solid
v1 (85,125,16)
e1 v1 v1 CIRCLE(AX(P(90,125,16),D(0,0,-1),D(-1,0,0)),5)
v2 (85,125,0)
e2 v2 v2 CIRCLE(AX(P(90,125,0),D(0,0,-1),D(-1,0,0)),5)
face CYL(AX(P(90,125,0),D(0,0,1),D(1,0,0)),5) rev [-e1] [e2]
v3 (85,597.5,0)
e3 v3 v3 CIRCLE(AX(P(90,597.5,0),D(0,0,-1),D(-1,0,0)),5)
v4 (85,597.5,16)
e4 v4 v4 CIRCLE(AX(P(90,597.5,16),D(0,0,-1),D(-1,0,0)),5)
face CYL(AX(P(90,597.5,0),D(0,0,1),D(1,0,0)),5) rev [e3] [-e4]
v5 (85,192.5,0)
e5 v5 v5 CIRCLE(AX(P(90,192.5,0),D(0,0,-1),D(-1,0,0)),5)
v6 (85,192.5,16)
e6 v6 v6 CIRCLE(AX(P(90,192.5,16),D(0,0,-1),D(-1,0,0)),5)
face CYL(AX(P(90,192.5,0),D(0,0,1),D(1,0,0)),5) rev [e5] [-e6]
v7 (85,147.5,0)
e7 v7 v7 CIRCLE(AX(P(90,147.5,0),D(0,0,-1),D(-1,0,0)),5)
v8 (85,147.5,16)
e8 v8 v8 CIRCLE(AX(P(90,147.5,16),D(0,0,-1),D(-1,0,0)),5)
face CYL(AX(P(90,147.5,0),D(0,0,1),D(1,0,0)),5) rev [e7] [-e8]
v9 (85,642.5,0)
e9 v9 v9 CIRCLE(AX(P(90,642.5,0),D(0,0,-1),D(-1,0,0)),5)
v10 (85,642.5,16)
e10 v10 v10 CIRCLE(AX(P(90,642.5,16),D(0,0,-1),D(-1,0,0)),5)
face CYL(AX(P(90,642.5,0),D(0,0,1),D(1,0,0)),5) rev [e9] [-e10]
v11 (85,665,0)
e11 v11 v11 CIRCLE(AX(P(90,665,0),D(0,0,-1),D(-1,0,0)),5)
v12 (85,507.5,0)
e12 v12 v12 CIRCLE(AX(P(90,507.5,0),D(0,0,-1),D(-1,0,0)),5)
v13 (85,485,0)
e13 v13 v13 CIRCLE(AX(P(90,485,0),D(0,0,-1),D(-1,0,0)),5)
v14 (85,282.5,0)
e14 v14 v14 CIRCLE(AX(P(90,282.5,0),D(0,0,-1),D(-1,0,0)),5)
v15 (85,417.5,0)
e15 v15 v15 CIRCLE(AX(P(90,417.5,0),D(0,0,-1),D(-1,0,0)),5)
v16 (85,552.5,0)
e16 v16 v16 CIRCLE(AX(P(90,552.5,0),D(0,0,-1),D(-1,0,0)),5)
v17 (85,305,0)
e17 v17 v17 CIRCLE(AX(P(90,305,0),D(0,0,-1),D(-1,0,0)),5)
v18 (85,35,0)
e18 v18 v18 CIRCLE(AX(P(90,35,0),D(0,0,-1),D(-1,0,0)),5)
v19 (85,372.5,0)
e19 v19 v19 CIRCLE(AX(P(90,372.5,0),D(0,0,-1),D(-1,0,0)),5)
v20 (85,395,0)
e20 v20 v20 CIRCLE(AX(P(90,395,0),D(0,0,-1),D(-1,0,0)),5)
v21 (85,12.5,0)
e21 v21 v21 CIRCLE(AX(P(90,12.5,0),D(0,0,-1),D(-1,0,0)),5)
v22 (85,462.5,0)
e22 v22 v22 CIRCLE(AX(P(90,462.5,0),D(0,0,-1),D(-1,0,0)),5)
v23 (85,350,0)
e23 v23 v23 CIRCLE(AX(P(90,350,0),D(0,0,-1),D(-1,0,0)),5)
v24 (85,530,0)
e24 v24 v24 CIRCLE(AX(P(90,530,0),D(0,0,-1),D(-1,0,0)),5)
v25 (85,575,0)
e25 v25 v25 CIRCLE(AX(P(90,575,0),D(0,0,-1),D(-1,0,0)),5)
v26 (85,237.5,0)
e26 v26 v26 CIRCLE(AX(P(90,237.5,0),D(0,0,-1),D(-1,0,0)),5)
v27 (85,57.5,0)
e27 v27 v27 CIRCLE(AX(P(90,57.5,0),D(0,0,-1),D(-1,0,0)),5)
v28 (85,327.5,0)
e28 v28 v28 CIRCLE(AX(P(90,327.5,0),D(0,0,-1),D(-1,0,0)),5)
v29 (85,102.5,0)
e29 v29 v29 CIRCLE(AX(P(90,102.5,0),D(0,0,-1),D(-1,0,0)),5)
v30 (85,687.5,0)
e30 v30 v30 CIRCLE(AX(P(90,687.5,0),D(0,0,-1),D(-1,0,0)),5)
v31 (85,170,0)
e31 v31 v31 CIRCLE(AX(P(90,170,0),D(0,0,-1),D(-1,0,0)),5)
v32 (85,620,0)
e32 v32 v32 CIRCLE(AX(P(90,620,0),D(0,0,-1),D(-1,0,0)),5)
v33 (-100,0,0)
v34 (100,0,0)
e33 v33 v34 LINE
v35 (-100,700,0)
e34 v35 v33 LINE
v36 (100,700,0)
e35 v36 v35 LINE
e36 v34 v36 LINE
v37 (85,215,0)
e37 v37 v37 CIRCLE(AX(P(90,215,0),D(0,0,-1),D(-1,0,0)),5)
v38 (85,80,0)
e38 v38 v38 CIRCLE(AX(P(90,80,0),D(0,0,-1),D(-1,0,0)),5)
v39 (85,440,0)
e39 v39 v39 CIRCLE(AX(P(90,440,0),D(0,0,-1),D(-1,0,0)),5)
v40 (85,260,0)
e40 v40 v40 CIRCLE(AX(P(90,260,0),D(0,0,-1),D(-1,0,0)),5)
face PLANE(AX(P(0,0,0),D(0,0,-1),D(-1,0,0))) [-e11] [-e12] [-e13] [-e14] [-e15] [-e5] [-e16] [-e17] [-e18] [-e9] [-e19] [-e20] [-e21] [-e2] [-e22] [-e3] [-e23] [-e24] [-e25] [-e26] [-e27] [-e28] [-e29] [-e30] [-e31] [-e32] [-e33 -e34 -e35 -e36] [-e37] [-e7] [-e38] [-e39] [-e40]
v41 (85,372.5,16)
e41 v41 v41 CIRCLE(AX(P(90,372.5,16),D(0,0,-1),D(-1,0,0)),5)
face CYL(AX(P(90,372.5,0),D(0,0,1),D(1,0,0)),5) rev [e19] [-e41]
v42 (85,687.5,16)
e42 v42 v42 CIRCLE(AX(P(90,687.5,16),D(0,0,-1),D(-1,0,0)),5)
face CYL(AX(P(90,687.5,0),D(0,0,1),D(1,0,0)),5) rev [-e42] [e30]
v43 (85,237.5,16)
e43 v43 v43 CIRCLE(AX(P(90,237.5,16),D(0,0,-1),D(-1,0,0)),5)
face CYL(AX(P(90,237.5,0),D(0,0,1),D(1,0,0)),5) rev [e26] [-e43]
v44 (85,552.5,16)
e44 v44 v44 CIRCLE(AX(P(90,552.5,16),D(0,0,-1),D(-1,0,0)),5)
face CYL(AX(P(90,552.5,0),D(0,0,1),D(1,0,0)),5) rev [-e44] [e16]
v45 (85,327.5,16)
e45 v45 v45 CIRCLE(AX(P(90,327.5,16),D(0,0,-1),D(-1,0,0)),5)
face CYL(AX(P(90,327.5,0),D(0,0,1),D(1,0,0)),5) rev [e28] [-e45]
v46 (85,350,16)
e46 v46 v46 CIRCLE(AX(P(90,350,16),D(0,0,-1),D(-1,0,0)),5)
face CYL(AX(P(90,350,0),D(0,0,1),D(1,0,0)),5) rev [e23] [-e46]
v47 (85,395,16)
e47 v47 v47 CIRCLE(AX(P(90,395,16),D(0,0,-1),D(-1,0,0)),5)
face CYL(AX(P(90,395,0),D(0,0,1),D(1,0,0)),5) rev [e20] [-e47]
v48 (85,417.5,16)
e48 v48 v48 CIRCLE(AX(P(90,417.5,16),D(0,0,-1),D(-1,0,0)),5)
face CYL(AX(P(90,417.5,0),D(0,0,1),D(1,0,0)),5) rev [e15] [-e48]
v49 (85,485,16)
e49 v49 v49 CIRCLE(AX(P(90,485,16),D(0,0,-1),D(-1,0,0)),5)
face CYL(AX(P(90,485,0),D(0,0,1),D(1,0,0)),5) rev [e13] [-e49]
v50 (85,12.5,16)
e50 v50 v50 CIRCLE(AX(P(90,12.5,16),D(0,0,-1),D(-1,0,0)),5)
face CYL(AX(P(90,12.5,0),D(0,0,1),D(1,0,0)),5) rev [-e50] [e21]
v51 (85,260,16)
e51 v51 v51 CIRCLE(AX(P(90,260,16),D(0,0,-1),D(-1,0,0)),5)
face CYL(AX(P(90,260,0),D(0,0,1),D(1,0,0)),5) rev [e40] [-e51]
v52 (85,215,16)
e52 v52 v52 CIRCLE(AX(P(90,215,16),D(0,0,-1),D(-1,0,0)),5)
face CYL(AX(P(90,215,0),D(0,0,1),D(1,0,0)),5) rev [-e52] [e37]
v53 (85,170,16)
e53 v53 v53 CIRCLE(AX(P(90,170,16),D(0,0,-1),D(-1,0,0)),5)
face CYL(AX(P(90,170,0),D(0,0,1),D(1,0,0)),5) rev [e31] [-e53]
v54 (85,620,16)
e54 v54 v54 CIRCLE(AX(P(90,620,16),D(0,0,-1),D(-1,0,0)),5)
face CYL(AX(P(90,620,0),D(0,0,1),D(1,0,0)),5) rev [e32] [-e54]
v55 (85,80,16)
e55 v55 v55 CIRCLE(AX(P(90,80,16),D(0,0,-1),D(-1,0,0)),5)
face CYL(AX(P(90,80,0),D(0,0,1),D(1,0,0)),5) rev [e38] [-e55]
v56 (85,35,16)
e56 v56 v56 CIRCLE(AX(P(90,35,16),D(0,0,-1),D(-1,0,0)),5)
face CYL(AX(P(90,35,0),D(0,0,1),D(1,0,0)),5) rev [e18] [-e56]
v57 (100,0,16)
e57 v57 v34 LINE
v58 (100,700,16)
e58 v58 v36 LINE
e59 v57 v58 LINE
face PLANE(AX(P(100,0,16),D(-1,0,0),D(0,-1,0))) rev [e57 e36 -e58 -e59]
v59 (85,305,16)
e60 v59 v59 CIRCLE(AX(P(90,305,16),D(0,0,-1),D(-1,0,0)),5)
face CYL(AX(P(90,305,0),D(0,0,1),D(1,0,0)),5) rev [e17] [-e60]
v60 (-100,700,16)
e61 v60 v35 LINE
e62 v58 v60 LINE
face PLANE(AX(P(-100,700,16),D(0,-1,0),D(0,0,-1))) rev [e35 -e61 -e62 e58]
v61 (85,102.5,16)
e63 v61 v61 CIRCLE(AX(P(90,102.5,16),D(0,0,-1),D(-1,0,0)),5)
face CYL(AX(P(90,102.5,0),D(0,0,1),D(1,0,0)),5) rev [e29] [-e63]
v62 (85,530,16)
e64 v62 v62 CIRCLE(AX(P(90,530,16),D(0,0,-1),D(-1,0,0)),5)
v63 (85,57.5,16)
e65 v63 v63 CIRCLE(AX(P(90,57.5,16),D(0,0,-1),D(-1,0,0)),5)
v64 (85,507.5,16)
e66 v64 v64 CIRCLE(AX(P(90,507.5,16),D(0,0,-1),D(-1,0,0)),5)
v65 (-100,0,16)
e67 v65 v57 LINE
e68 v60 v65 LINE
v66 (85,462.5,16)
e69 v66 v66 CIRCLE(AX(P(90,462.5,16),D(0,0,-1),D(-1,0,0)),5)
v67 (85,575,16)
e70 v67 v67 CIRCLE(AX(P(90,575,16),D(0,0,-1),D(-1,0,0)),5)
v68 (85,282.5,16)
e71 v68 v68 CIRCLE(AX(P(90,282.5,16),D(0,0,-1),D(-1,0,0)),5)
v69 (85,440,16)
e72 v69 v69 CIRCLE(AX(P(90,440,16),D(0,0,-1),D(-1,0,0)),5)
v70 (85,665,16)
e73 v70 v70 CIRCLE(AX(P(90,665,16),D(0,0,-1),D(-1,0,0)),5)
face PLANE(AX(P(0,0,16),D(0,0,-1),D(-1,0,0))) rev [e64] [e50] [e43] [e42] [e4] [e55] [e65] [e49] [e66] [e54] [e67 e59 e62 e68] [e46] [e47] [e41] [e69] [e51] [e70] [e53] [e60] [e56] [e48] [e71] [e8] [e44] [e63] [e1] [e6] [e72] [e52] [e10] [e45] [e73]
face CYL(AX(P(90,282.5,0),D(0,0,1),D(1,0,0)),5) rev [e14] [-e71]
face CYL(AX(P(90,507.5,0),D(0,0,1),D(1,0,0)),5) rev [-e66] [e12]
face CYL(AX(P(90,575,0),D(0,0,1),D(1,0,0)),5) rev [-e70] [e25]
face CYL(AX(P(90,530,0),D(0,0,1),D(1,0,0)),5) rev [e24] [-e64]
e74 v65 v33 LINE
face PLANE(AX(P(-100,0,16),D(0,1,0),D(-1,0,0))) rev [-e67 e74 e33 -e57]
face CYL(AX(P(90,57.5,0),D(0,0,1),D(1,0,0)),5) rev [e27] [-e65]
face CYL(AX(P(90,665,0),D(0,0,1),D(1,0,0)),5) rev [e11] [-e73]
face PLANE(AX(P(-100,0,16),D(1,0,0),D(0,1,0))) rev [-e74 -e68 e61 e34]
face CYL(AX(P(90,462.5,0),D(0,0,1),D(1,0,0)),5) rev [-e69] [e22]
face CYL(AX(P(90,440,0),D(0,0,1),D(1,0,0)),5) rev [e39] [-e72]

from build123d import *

# Parameters (mm, degrees)
SKETCH1_W           = 200
SKETCH1_H           = 700
BOSS_EXTRUDE1_DEPTH = 16
SKETCH2_OUTSIDE_W   = 347.638
SKETCH2_OUTSIDE_H   = 847.638
SKETCH2_OUTSIDE_R   = 5
CUT_EXTRUDE8_DEPTH  = 708.287777358
LPATTERN1_OUTLINE_R = 5
LPATTERN1_DEPTH     = 16


# Read off the part's stored shape, not the designer's step: LPattern1
with BuildPart() as part:
    # Sketch1 → Boss-Extrude1 (new body)
    with BuildSketch(Plane.XY):
        with Locations((0, 350)):
            Rectangle(SKETCH1_W, SKETCH1_H)
    extrude(amount=BOSS_EXTRUDE1_DEPTH)

    # Sketch2 outside → Cut-Extrude8 (cut, symmetric)
    # profile 1 of 2: a face of its own
    with BuildSketch(Plane.XY.offset(16)):
        with Locations((0, 350)):
            Rectangle(SKETCH2_OUTSIDE_W, SKETCH2_OUTSIDE_H)
        Polygon((90, 0), (100, 0), (100, 12.5), (100, 700), (-100, 700), (-100, 0), align=None, mode=Mode.SUBTRACT)
    # profile 2 of 2: a face of its own
    with BuildSketch(Plane.XY.offset(16)):
        with Locations(Location((90, 12.5, 0), (0, 0, 180))):
            Circle(SKETCH2_OUTSIDE_R)
    extrude(amount=CUT_EXTRUDE8_DEPTH, both=True, mode=Mode.SUBTRACT)

    # LPattern1 outline → LPattern1 (cut)
    with BuildSketch(Plane.XY):
        with Locations((90, 687.5)):
            Circle(LPATTERN1_OUTLINE_R)
        with Locations((90, 665)):
            Circle(LPATTERN1_OUTLINE_R)
        with Locations((90, 642.5)):
            Circle(LPATTERN1_OUTLINE_R)
        with Locations((90, 620)):
            Circle(LPATTERN1_OUTLINE_R)
        with Locations((90, 597.5)):
            Circle(LPATTERN1_OUTLINE_R)
        with Locations((90, 575)):
            Circle(LPATTERN1_OUTLINE_R)
        with Locations((90, 552.5)):
            Circle(LPATTERN1_OUTLINE_R)
        with Locations((90, 530)):
            Circle(LPATTERN1_OUTLINE_R)
        with Locations((90, 507.5)):
            Circle(LPATTERN1_OUTLINE_R)
        with Locations((90, 485)):
            Circle(LPATTERN1_OUTLINE_R)
        with Locations((90, 462.5)):
            Circle(LPATTERN1_OUTLINE_R)
        with Locations((90, 440)):
            Circle(LPATTERN1_OUTLINE_R)
        with Locations((90, 417.5)):
            Circle(LPATTERN1_OUTLINE_R)
        with Locations((90, 395)):
            Circle(LPATTERN1_OUTLINE_R)
        with Locations((90, 372.5)):
            Circle(LPATTERN1_OUTLINE_R)
        with Locations((90, 350)):
            Circle(LPATTERN1_OUTLINE_R)
        with Locations((90, 327.5)):
            Circle(LPATTERN1_OUTLINE_R)
        with Locations((90, 305)):
            Circle(LPATTERN1_OUTLINE_R)
        with Locations((90, 282.5)):
            Circle(LPATTERN1_OUTLINE_R)
        with Locations((90, 260)):
            Circle(LPATTERN1_OUTLINE_R)
        with Locations((90, 237.5)):
            Circle(LPATTERN1_OUTLINE_R)
        with Locations((90, 215)):
            Circle(LPATTERN1_OUTLINE_R)
        with Locations((90, 192.5)):
            Circle(LPATTERN1_OUTLINE_R)
        with Locations((90, 170)):
            Circle(LPATTERN1_OUTLINE_R)
        with Locations((90, 147.5)):
            Circle(LPATTERN1_OUTLINE_R)
        with Locations((90, 125)):
            Circle(LPATTERN1_OUTLINE_R)
        with Locations((90, 102.5)):
            Circle(LPATTERN1_OUTLINE_R)
        with Locations((90, 80)):
            Circle(LPATTERN1_OUTLINE_R)
        with Locations((90, 57.5)):
            Circle(LPATTERN1_OUTLINE_R)
        with Locations((90, 35)):
            Circle(LPATTERN1_OUTLINE_R)
    extrude(amount=LPATTERN1_DEPTH, mode=Mode.SUBTRACT)


solid = part.part
